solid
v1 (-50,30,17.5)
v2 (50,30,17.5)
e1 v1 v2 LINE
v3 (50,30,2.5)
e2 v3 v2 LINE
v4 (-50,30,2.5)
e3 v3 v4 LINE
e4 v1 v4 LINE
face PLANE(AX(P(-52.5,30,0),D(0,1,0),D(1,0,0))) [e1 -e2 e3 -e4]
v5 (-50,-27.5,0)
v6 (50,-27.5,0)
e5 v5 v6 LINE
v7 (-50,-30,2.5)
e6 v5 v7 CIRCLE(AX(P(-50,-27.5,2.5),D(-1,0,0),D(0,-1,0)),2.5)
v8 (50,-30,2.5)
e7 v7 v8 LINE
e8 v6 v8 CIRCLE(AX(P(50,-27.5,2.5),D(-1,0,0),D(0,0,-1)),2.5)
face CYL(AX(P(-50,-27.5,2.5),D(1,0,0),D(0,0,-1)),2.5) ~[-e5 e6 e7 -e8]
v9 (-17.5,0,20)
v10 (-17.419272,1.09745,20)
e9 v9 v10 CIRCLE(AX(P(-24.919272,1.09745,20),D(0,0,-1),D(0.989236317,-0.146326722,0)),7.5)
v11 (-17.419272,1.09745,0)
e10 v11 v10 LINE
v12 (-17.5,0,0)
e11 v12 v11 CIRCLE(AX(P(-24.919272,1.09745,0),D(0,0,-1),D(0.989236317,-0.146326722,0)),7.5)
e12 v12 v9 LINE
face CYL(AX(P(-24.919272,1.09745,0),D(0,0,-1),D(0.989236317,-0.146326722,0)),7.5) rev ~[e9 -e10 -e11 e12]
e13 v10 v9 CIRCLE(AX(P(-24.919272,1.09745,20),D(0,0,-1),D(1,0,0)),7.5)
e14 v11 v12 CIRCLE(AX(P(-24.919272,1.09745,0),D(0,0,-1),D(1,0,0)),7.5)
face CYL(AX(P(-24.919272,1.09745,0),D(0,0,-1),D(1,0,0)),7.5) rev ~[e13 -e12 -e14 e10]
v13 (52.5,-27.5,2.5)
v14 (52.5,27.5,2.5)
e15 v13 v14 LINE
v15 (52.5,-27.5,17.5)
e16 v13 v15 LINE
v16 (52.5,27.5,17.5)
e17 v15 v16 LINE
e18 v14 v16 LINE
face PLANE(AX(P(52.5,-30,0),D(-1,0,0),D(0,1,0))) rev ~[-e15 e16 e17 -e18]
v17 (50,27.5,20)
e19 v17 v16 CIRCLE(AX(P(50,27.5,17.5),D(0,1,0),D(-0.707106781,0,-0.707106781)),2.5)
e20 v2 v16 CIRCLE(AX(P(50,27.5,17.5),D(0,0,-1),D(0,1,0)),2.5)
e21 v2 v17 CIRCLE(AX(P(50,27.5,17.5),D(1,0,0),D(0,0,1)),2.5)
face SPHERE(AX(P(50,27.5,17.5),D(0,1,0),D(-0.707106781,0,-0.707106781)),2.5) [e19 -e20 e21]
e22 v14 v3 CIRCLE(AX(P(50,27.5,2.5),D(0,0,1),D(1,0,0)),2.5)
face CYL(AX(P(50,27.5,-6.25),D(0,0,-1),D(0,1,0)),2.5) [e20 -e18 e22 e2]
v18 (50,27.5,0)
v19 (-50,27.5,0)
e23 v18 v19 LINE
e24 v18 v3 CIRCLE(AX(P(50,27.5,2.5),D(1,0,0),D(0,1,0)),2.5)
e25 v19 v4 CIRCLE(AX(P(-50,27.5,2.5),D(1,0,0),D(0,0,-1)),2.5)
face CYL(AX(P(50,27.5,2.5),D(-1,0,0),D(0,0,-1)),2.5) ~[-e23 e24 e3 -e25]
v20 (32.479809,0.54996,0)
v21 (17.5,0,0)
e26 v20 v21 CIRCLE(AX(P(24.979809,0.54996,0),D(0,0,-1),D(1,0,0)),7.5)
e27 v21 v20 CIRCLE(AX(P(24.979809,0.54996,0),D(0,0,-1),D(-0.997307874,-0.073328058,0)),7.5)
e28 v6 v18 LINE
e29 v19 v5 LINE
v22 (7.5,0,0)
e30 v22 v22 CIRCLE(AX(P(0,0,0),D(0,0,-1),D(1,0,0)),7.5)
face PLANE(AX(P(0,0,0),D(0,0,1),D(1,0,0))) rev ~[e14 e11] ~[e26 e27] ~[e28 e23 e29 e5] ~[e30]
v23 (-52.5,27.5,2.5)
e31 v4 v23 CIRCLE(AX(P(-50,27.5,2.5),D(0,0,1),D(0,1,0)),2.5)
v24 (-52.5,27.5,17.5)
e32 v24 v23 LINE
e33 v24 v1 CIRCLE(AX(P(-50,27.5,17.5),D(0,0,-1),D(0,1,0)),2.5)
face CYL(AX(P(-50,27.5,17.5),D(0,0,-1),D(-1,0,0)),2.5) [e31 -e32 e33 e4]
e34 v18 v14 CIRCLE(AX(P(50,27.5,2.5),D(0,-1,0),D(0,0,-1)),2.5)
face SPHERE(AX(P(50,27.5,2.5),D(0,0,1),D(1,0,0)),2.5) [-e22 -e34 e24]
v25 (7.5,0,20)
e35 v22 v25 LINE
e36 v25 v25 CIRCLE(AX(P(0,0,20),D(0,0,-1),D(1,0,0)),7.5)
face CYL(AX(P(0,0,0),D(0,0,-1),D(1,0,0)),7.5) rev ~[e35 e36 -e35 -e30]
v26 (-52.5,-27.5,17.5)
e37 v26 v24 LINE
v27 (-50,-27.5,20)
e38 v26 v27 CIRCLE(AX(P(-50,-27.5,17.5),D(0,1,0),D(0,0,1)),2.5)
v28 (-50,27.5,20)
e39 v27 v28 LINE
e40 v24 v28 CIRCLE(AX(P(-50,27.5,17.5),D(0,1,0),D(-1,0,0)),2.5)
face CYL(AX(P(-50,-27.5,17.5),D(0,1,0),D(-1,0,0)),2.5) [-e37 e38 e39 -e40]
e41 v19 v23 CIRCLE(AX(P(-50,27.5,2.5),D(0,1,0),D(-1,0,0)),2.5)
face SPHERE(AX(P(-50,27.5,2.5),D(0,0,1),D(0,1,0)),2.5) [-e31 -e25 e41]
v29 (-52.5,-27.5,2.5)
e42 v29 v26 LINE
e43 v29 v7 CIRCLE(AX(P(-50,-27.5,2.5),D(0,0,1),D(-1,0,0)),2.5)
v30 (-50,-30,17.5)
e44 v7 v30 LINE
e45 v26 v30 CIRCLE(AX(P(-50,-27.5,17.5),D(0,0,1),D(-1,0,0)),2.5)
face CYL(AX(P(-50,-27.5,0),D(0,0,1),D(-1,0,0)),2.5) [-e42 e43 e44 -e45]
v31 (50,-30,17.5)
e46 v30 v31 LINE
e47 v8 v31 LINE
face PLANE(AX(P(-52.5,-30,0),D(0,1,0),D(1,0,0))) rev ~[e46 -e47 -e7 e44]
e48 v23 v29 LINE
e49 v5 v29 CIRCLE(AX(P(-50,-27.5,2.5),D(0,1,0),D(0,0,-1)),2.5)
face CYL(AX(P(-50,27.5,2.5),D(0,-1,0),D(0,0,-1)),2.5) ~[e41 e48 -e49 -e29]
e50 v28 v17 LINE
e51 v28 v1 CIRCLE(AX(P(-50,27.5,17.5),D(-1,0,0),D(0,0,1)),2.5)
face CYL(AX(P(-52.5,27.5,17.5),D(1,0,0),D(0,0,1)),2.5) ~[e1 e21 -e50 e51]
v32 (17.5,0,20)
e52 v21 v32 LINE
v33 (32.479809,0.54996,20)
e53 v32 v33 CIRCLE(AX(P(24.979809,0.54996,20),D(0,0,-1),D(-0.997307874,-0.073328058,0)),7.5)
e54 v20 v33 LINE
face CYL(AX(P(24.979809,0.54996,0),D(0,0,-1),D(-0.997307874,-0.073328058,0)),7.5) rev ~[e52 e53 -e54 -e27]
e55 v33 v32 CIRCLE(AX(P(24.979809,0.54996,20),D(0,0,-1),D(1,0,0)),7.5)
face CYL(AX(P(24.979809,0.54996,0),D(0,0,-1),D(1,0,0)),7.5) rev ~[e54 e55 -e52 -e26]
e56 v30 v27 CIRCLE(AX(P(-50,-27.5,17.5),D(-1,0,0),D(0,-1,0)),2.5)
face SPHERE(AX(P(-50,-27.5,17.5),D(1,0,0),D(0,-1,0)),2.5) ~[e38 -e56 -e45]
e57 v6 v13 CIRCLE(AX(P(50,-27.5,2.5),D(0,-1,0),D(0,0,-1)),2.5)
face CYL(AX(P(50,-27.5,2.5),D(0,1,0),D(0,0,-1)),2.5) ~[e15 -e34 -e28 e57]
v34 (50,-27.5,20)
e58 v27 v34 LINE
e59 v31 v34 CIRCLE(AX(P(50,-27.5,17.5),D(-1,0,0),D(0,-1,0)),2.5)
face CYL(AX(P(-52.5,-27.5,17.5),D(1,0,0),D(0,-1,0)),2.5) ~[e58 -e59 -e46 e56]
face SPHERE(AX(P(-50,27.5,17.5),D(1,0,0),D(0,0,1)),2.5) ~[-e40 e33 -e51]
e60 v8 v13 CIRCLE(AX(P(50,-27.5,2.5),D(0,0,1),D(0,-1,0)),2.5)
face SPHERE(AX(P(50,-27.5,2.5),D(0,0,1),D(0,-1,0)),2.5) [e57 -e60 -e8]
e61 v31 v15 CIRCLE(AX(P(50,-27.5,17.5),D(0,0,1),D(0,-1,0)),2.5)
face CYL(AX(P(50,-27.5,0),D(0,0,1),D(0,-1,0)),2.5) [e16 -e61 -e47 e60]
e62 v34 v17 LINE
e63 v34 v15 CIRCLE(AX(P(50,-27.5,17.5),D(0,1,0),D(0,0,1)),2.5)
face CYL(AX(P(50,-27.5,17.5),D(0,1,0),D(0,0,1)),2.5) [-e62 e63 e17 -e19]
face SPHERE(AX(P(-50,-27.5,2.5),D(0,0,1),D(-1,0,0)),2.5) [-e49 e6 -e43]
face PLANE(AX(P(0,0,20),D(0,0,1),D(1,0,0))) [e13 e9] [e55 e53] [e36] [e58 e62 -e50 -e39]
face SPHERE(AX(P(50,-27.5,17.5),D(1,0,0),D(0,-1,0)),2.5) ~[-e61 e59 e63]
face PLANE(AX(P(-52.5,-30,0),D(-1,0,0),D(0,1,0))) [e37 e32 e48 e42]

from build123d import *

# Parameters (mm, degrees)
F0_W        = 105
F0_H        = 60
F1_DEPTH    = 20
F2_R        = 2.5
F3_R        = 2.5
F4_R        = 2.5
F5_T1_DEPTH = 23.75
F5_S5_W     = 2.5
F5_S5_H     = 2.5
F5_T6_DEPTH = 2.5
F6_R        = 2.5


# Not quite as in the source:
# - a fillet or chamfer that OpenCascade refuses, or shapes differently, is made with other operations: its cross-section is extruded or revolved along the edge and cut away or added


with BuildPart() as f1:
    # F0 (on Top) → F1 (new body)
    with BuildSketch(Plane.XY):
        Rectangle(F0_W, F0_H)
        with BuildLine():
            ThreePointArc((-17.4192723763, 1.0974504119), (-17.4394815095, 0.547242643), (-17.5, 0))
            ThreePointArc((-17.5, 0), (-32.3990632431, 1.6476581808), (-17.4192723763, 1.0974504119))
        make_face(mode=Mode.SUBTRACT)
        with BuildLine():
            ThreePointArc((-7.5, 0), (0, 7.5), (7.5, 0))
            ThreePointArc((7.5, 0), (0, -7.5), (-7.5, 0))
        make_face(mode=Mode.SUBTRACT)
        with BuildLine():
            ThreePointArc((32.4798090562, 0.5499604379), (25.2549745325, -6.9449901264), (17.5, 0))
            ThreePointArc((17.5, 0), (24.7046435799, 8.0449110021), (32.4798090562, 0.5499604379))
        make_face(mode=Mode.SUBTRACT)
    extrude(amount=F1_DEPTH)

    # F2
    f2_edges = [f1.edges().sort_by_distance(p)[0] for p in [
        (0, -30, 20),
    ]]
    fillet(f2_edges, radius=F2_R)

    # F3
    f3_edges = [f1.edges().sort_by_distance(p)[0] for p in [
        (52.5, 1.25, 20),
        (0, 30, 20),
    ]]
    fillet(f3_edges, radius=F3_R)

    # F4
    f4_edges = [f1.edges().sort_by_distance(p)[0] for p in [
        (-52.5, 0, 20),
    ]]
    fillet(f4_edges, radius=F4_R)

    # F5: fillet of radius 2.5 on 1 edges, made by hand

    # F5_s2 → F5_t1 (cut)
    with BuildSketch(Plane.XY.offset(-6.25)):
        with BuildLine():
            ThreePointArc((50, 30), (51.767766953, 29.267766953), (52.5, 27.5))
            Line((52.5, 27.5), (52.5, 30))
            Line((52.5, 30), (50, 30))
        make_face()
    extrude(amount=F5_T1_DEPTH, mode=Mode.SUBTRACT)


with BuildPart() as f5_tool4:
    # F5_s5 → F5_t6 (new body)
    with BuildSketch(Plane.XZ.offset(-27.5)):
        with Locations((51.25, 18.75)):
            Rectangle(F5_S5_W, F5_S5_H)
    extrude(amount=-F5_T6_DEPTH)

    # F5_s7 → F5_t8 (revolve, cut)
    with BuildSketch(Plane(origin=(50, 27.5, 17.5), x_dir=(-0.7071067812, 0, -0.7071067812), z_dir=(0.7071067812, 0, -0.7071067812))):
        with BuildLine():
            ThreePointArc((0, -2.5), (2.5, 0), (0, 2.5))
            Line((0, 2.5), (0, -2.5))
        make_face()
    revolve(axis=Axis((50, 27.5, 17.5), (0, 1, 0)), mode=Mode.SUBTRACT)


with BuildPart() as f1_1:
    add(f1.part)

    # F5_t3: cut F5_tool4
    add(f5_tool4.part, mode=Mode.SUBTRACT)

    # F6
    f6_edges = [f1_1.edges().sort_by_distance(p)[0] for p in [
        (52.5, 0, 0),
    ]]
    fillet(f6_edges, radius=F6_R)


solid = f1_1.part
